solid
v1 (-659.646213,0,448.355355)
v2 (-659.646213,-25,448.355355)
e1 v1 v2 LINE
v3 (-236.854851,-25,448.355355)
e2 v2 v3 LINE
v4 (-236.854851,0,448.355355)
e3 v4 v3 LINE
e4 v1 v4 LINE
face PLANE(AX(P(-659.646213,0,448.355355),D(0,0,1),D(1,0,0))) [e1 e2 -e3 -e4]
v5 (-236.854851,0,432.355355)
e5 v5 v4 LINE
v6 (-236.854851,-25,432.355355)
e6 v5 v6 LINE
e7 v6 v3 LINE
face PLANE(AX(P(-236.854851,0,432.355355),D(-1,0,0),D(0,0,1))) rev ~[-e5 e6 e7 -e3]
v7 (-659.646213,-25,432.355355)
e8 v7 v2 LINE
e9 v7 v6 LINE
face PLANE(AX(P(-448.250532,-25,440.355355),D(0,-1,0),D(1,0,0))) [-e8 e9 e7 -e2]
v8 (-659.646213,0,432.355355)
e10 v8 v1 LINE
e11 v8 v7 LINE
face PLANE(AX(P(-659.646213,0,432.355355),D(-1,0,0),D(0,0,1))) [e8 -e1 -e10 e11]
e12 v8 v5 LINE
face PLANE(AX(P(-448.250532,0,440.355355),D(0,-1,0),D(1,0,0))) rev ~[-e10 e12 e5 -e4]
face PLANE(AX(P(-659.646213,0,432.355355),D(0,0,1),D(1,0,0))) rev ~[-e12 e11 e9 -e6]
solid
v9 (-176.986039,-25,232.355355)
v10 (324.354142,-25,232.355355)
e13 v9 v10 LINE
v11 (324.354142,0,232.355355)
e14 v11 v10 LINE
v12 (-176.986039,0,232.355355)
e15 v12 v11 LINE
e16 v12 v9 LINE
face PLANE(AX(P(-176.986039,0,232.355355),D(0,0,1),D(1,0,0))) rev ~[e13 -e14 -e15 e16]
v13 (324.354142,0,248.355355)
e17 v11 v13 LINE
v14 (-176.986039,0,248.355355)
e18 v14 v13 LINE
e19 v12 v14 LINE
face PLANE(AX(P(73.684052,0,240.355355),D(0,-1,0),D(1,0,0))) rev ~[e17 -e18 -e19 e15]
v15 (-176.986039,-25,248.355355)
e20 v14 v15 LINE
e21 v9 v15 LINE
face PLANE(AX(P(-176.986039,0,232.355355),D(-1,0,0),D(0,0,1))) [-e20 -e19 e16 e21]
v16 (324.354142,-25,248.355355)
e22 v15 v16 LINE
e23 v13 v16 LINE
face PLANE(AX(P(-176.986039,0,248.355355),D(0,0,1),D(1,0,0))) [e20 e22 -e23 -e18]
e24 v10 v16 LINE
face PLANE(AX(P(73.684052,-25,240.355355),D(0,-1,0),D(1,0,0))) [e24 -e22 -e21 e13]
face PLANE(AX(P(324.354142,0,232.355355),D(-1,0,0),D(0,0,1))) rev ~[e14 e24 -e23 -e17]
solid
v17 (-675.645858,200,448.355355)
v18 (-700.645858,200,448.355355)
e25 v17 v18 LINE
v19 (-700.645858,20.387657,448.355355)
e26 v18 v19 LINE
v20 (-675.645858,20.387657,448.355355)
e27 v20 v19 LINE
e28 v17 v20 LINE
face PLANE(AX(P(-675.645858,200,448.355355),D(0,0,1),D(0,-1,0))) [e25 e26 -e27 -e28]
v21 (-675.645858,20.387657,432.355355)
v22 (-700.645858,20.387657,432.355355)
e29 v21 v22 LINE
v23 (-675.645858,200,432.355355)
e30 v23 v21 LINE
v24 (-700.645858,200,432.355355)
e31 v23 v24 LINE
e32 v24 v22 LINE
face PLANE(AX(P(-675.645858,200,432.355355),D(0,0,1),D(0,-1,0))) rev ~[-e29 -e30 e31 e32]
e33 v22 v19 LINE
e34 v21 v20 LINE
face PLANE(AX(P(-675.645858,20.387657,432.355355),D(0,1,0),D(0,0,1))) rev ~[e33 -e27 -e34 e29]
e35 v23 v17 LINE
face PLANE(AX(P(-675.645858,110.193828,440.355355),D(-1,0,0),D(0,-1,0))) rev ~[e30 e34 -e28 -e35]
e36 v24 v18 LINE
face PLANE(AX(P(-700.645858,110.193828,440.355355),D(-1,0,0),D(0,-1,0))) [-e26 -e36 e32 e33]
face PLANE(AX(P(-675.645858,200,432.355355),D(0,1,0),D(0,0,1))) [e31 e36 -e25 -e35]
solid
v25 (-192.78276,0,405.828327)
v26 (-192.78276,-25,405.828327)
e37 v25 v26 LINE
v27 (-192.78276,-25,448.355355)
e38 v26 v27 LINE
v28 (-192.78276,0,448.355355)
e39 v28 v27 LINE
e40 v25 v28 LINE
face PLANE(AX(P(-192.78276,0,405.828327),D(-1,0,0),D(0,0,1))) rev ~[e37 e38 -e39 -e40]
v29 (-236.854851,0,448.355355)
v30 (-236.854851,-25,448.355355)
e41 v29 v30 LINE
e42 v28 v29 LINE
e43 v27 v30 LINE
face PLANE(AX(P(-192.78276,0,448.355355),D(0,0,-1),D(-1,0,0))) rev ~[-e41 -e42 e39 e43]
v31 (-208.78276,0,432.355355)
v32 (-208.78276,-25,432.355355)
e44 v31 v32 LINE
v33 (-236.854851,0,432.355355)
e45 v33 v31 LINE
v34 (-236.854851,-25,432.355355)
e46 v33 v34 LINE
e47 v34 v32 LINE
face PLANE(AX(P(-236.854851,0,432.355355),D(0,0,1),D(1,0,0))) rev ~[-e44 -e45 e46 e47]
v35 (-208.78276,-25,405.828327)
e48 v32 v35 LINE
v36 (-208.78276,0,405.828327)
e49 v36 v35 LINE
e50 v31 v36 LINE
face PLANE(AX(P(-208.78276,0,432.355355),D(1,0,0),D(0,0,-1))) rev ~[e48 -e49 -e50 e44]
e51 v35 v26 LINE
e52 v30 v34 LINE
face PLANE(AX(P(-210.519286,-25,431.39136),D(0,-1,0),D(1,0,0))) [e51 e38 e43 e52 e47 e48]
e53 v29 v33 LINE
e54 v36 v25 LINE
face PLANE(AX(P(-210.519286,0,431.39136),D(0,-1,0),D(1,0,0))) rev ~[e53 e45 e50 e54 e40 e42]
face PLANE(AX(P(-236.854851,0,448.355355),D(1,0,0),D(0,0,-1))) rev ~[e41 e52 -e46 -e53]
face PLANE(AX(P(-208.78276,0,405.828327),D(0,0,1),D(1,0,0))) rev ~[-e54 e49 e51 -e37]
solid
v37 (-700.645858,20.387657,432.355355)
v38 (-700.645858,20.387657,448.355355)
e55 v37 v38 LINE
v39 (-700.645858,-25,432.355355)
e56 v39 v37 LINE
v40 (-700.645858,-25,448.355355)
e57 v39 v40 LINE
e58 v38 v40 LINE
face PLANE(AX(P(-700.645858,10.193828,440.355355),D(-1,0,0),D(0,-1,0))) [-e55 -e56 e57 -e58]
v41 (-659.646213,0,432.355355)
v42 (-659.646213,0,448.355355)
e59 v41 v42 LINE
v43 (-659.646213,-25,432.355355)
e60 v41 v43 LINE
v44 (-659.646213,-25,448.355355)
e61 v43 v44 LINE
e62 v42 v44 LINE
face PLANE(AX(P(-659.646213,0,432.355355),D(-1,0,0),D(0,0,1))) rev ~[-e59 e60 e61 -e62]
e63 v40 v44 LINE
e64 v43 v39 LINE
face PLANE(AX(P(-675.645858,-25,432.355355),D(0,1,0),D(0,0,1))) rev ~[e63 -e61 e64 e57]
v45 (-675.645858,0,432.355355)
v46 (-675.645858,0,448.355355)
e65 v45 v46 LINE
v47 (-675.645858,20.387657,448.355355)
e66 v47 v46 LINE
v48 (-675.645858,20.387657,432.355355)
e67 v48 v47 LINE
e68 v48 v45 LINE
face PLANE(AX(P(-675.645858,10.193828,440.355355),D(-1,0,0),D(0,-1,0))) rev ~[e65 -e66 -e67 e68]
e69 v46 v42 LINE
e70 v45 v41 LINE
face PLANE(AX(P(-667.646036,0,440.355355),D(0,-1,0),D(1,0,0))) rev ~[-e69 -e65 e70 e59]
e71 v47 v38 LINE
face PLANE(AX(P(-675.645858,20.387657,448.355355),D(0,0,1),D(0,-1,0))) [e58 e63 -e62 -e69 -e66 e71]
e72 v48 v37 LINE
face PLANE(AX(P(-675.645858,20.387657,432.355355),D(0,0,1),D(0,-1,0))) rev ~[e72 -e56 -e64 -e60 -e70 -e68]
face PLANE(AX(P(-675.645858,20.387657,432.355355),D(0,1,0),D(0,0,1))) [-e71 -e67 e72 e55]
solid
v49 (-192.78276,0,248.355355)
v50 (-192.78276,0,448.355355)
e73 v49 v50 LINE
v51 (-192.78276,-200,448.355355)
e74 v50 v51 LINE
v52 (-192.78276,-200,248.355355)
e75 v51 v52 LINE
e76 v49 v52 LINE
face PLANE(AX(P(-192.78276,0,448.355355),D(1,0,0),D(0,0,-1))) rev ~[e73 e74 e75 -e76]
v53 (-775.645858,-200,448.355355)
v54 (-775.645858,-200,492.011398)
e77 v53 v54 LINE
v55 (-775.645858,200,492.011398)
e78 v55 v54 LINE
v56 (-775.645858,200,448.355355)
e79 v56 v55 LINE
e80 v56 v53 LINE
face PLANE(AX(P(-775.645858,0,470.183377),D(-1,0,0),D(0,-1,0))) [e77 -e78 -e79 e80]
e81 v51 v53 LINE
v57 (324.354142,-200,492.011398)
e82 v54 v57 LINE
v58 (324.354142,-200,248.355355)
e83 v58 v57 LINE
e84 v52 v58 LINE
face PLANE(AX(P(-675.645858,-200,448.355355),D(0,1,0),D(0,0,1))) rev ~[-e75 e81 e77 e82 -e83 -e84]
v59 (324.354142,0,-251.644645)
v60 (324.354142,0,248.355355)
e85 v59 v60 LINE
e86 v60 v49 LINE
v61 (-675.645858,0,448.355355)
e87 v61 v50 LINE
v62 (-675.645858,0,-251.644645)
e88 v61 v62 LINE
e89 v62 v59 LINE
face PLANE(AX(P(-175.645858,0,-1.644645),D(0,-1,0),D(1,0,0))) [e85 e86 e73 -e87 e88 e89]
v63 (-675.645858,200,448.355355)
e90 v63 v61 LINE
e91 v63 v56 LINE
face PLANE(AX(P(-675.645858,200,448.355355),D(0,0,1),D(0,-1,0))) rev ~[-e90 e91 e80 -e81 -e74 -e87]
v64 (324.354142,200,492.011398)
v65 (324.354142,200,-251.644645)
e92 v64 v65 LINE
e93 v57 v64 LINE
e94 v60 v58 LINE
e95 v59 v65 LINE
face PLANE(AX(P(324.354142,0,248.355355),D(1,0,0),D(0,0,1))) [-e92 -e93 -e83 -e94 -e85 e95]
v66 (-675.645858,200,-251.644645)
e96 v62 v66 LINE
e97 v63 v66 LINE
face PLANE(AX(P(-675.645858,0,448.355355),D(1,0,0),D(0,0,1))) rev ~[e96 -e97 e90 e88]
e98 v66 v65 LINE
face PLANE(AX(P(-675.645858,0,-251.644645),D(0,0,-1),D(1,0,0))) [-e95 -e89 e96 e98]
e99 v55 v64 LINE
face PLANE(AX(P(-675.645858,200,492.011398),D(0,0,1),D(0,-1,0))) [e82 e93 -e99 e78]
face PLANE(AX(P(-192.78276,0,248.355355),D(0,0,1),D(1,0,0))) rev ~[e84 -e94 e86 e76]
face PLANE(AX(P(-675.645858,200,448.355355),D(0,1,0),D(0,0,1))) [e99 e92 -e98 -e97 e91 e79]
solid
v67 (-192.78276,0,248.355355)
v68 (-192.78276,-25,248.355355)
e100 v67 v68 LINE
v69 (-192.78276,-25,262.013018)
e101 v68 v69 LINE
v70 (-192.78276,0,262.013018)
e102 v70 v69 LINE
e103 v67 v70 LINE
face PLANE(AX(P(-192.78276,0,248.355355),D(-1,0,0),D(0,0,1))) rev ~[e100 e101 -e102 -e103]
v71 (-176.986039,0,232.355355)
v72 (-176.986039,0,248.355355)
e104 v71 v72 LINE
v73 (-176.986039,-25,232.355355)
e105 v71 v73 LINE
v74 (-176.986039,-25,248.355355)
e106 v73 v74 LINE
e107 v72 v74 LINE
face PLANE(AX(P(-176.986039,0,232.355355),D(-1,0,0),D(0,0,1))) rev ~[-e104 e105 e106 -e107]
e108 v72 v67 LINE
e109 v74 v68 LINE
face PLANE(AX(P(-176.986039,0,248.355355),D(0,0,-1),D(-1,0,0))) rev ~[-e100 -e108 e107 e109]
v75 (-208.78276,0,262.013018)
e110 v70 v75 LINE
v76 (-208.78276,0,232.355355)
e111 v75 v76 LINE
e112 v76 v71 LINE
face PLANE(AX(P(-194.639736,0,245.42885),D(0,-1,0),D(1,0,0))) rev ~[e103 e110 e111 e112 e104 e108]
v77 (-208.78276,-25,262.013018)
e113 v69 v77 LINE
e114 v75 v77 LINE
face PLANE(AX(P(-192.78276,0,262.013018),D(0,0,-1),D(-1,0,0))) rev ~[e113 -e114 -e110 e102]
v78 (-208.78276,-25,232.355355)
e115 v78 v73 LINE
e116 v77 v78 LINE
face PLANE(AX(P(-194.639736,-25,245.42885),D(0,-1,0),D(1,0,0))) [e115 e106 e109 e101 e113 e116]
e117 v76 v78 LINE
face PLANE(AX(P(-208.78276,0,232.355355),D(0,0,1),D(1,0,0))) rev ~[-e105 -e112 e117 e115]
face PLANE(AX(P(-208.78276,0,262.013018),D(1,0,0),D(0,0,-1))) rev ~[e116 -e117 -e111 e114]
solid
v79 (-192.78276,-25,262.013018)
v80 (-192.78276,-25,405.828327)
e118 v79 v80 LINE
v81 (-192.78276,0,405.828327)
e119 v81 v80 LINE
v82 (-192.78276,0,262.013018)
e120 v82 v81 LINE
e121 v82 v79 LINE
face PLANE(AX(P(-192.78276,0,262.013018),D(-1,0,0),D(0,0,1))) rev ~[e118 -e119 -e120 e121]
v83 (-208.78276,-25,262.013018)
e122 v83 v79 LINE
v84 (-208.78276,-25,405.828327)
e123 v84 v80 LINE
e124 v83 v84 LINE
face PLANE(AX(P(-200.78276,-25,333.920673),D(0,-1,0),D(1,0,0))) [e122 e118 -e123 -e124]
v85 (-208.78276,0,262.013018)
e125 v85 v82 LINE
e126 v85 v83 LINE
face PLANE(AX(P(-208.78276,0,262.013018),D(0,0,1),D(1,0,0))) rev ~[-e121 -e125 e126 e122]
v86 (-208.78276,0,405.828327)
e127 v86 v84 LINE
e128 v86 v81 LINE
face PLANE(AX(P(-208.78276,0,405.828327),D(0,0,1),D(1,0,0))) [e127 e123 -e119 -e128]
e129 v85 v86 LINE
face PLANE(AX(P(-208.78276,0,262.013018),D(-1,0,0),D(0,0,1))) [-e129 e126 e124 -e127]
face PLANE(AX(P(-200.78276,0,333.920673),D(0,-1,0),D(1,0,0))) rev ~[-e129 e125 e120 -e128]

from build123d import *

# Parameters (mm, degrees)
F0_W          = 482.8630983498
F0_H          = 200
F1_DEPTH      = 200
F0_H_2        = 43.6560429633
F2_DEPTH      = 200
F2_DEPTH_BACK = 200
F3_W          = 501.3401806686
F3_H          = 16
F4_DEPTH      = 25
F3_W_2        = 422.7913618088
F3_W_3        = 16
F3_H_2        = 143.8153088093
F3_W_4        = 15.9996449616
F5_DEPTH      = 25
F6_W          = 400
F6_H          = 43.6560429633
F7_DEPTH      = 100
F8_W          = 20.3876569867
F8_H          = 16
F5_FACE_W     = 25
F5_FACE_H     = 16
F9_DEPTH      = 25
F8_W_2        = 179.6123430133
F10_DEPTH     = 25


with BuildPart() as f1:
    # F0 (on Front) → F1 (new body)
    with BuildSketch(Plane.XZ):
        Polygon((-192.7827596664, 248.3553551137), (-675.6458580162, 248.3553551137), (-675.6458580162, -251.6446448863), (324.3541419838, -251.6446448863), (324.3541419838, 248.3553551137), align=None)
        with Locations((-434.2143088413, 348.3553551137)):
            Rectangle(F0_W, F0_H)
    extrude(amount=-F1_DEPTH)

    # F0 (on Front) → F2 (join, two sides)
    with BuildSketch(Plane.XZ) as f2_sk:
        with Locations((-434.2143088413, 470.1833765954)):
            Rectangle(F0_W, F0_H_2)
        Polygon((-192.7827596664, 448.3553551137), (-192.7827596664, 248.3553551137), (324.3541419838, 248.3553551137), (324.3541419838, 492.011398077), (-192.7827596664, 492.011398077), align=None)
    extrude(amount=F2_DEPTH)
    extrude(f2_sk.sketch, amount=-F2_DEPTH_BACK)

    # F6 (on face) → F7 (join)
    with BuildSketch(Plane(origin=(-675.6458580162, 0, 0), x_dir=(0, -1, 0), z_dir=(-1, 0, 0))):
        with Locations((0, 470.1833765954)):
            Rectangle(F6_W, F6_H)
    extrude(amount=F7_DEPTH)


with BuildPart() as f4:
    # F3 (on face) → F4 (new body)
    with BuildSketch(Plane.XZ):
        with Locations((73.6840516495, 240.3553551137)):
            Rectangle(F3_W, F3_H)
    extrude(amount=F4_DEPTH)


with BuildPart() as f4b:
    # F3 (on face) → F4, piece 2 (new body)
    with BuildSketch(Plane.XZ):
        with Locations((-448.2505321503, 440.3553551137)):
            Rectangle(F3_W_2, F3_H)
    extrude(amount=F4_DEPTH)


with BuildPart() as f4c:
    # F3 (on face) → F4, piece 3 (new body)
    with BuildSketch(Plane.XZ):
        with Locations((-200.7827596664, 333.9206725359)):
            Rectangle(F3_W_3, F3_H_2)
    extrude(amount=F4_DEPTH)


with BuildPart() as f5:
    # F3 (on face) → F5 (new body)
    with BuildSketch(Plane.XZ):
        with Locations((-667.6460355355, 440.3553551137)):
            Rectangle(F3_W_4, F3_H)
    extrude(amount=F5_DEPTH)

    # F8 (on face) + F5_face (on face) → F9 (join)
    with BuildSketch(Plane(origin=(-675.6458580162, 0, 0), x_dir=(0, -1, 0), z_dir=(-1, 0, 0))):
        with Locations((-10.1938284934, 440.3553551137)):
            Rectangle(F8_W, F8_H)
    with BuildSketch(Plane(origin=(-675.6458580162, -12.5, 440.3553551137), x_dir=(0, -1, 0), z_dir=(-1, 0, 0))):
        Rectangle(F5_FACE_W, F5_FACE_H)
    extrude(amount=F9_DEPTH)


with BuildPart() as f5b:
    # F3 (on face) → F5, piece 2 (new body)
    with BuildSketch(Plane.XZ):
        Polygon((-192.7827596664, 448.3553551137), (-236.8548512459, 448.3553551137), (-236.8548512459, 432.3553551137), (-208.7827596664, 432.3553551137), (-208.7827596664, 405.8283269405), (-192.7827596664, 405.8283269405), (-192.7827596664, 423.3553551137), (-192.7827596664, 432.3553551137), align=None)
    extrude(amount=F5_DEPTH)


with BuildPart() as f5c:
    # F3 (on face) → F5, piece 3 (new body)
    with BuildSketch(Plane.XZ):
        Polygon((-192.7827596664, 232.3553551137), (-176.9860386848, 232.3553551137), (-176.9860386848, 248.3553551137), (-192.7827596664, 248.3553551137), (-192.7827596664, 262.0130181313), (-208.7827596664, 262.0130181313), (-208.7827596664, 232.3553551137), align=None)
    extrude(amount=F5_DEPTH)


with BuildPart() as f10:
    # F8 (on face) → F10 (new body)
    with BuildSketch(Plane(origin=(-675.6458580162, 0, 0), x_dir=(0, -1, 0), z_dir=(-1, 0, 0))):
        with Locations((-110.1938284934, 440.3553551137)):
            Rectangle(F8_W_2, F8_H)
    extrude(amount=F10_DEPTH)


solid = Compound([f1.part, f4.part, f4b.part, f4c.part, f5.part, f5b.part, f5c.part, f10.part])
